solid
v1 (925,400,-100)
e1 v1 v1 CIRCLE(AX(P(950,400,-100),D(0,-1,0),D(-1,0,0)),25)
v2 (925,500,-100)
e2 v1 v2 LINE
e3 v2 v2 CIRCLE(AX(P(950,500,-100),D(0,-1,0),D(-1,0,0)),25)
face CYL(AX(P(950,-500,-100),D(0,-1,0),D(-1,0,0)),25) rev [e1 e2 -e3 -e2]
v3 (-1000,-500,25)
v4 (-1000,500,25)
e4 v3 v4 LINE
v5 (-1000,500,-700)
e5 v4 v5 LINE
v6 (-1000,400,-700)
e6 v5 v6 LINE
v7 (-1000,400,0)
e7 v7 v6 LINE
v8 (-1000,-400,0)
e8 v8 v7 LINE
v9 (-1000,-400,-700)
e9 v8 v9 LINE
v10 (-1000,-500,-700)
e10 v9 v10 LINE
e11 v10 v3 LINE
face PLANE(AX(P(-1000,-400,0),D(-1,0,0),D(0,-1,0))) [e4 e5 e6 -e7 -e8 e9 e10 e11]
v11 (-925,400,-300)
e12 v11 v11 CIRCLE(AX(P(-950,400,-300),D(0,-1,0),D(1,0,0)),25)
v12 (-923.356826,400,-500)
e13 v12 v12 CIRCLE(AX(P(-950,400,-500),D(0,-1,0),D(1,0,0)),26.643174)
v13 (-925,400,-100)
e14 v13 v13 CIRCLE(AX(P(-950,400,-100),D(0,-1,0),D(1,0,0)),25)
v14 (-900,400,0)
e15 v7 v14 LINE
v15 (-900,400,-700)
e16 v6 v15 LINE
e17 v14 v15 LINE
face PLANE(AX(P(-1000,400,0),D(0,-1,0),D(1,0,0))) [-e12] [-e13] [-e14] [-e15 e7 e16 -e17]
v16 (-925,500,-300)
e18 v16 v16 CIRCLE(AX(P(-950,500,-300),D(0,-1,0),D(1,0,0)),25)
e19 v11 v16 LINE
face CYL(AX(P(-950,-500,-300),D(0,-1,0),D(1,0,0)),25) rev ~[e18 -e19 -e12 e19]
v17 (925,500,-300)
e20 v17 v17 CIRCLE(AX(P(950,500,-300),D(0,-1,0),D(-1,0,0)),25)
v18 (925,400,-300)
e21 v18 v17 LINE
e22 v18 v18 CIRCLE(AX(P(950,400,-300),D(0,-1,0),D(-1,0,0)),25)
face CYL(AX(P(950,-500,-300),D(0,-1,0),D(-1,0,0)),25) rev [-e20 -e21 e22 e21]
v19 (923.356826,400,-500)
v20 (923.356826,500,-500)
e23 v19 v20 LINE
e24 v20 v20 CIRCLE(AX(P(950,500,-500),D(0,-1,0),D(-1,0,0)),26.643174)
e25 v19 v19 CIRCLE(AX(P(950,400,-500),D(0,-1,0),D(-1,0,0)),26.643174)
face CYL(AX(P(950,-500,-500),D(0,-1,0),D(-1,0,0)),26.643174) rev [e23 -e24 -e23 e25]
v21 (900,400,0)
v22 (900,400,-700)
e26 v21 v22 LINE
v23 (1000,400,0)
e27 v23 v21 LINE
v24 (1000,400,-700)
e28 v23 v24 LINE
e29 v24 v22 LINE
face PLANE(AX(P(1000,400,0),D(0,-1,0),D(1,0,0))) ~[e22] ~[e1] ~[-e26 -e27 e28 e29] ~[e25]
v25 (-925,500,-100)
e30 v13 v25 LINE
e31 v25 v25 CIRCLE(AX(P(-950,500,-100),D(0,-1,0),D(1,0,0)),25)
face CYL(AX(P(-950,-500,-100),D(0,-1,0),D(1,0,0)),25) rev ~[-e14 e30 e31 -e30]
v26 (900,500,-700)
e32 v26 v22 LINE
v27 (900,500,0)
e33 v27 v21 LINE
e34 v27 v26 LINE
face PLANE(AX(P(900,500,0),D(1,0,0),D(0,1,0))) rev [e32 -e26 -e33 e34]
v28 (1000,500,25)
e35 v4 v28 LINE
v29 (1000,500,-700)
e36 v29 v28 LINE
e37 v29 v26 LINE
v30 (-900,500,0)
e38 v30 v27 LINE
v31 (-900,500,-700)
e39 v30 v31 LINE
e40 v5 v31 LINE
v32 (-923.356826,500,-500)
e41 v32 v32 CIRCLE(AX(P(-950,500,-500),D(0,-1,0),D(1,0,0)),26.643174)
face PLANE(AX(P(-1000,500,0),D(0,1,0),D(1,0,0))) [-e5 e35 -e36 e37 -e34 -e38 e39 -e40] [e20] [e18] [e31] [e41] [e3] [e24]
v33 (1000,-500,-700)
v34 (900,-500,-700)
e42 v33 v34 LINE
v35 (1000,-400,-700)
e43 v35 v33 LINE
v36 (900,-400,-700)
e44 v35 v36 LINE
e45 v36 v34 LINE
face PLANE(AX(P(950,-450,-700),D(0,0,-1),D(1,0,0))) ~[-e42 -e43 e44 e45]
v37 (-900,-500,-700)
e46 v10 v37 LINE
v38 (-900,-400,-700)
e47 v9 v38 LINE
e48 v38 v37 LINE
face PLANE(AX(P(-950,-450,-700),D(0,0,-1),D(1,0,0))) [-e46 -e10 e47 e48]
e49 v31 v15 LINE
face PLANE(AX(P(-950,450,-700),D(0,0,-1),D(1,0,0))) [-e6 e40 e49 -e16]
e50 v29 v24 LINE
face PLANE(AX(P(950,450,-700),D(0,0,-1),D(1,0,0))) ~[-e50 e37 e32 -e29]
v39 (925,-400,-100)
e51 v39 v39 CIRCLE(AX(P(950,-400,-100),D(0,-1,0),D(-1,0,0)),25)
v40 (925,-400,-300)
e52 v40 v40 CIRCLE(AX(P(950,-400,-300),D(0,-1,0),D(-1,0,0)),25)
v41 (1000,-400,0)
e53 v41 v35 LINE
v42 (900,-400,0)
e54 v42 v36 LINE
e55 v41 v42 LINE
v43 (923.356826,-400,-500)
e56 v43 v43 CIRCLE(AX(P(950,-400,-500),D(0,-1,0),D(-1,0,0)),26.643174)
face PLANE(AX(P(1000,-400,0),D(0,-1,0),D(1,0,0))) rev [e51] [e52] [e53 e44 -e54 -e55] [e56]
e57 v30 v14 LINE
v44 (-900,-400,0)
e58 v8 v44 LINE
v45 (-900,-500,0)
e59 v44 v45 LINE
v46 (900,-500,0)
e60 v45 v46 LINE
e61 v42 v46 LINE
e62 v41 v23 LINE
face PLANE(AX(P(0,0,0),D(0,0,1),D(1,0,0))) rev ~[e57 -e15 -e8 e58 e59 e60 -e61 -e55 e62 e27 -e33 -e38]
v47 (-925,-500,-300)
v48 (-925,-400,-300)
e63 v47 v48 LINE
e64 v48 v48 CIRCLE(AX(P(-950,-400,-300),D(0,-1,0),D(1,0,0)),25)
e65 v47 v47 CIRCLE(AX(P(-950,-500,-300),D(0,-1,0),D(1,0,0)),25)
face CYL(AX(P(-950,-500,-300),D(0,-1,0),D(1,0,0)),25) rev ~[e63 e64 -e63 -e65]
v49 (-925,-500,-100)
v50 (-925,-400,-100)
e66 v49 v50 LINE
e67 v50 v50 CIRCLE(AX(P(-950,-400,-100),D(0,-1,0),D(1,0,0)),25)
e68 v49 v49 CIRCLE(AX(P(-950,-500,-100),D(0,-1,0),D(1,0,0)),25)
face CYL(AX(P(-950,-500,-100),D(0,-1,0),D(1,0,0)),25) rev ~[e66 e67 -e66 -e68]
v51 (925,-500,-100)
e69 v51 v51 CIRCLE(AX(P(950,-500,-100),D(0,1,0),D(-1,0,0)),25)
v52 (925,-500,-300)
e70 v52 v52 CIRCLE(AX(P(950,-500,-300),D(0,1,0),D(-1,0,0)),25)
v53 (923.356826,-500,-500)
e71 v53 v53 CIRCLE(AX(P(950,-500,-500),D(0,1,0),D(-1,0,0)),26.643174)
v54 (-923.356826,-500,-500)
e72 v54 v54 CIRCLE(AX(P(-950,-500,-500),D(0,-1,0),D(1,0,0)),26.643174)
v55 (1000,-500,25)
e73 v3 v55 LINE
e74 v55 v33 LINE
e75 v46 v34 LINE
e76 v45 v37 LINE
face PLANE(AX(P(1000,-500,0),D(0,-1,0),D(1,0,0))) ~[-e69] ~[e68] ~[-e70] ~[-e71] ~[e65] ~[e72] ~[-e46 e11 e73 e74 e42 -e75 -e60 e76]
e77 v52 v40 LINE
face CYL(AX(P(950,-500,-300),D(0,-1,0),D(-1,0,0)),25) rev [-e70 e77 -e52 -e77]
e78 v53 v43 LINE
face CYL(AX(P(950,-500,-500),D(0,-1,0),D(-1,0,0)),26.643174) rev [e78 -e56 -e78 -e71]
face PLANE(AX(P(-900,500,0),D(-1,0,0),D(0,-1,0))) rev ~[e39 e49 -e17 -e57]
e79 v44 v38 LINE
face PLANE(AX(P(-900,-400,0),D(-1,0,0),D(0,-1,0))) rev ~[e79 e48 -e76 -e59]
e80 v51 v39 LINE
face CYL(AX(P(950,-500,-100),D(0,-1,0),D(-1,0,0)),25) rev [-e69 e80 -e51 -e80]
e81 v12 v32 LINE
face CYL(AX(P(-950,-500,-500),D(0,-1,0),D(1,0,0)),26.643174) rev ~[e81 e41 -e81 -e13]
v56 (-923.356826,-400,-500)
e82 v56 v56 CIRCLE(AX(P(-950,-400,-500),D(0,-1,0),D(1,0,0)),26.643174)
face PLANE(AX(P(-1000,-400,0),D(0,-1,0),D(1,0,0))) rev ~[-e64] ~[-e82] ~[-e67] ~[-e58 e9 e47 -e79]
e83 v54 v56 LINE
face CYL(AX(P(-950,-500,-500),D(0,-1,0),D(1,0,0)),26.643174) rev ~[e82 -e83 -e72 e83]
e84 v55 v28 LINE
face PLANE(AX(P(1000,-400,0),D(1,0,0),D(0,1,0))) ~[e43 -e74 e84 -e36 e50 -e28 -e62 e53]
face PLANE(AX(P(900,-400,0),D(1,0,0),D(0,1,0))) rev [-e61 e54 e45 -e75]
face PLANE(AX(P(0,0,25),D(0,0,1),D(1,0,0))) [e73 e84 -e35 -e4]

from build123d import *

# Parameters (mm, degrees)
F0_W     = 2000
F0_H     = 1000
F1_DEPTH = 25
F2_W     = 100
F2_H     = 100
F4_DEPTH = 700
F3_R     = 25
F3_R_2   = 26.6431742527
F5_DEPTH = 1000.001
F6_R     = 138.4561690077
F7_W     = 118.5409426689
F7_H     = 157.5430333614
F9_T     = 2.5


# Not quite as in the source:
# - a pattern or mirror of a feature is missing from the dataset's text; its kind, count and spacing are read off the source's solid
# - a shell that OpenCascade refuses in one call is made with other operations: the cavity is built on its own and cut out


with BuildPart() as f1:
    # F0 (on Top) → F1 (new body)
    with BuildSketch(Plane.XY):
        Rectangle(F0_W, F0_H)
    extrude(amount=F1_DEPTH)

    # F2 (on face) → F4 (join)
    with BuildSketch(Plane(origin=(0, 0, 0), x_dir=(1, 0, 0), z_dir=(0, 0, -1))):
        with Locations((-950, 450)):
            Rectangle(F2_W, F2_H)
        with Locations((-950, -450)):
            Rectangle(F2_W, F2_H)
    f4 = extrude(amount=F4_DEPTH)

    # F4_copies: F4 across plane
    add(f4.mirror(Plane(origin=(0, 0, 0), x_dir=(0, 0, 1), z_dir=(1, 0, 0))))

    # F3 (on face) → F5 (cut, through all)
    with BuildSketch(Plane.XZ.offset(500)):
        with Locations((-950, -100)):
            Circle(F3_R)
        with Locations((-950, -300)):
            Circle(F3_R)
        with Locations((-950, -500)):
            Circle(F3_R_2)
    f5 = extrude(amount=-F5_DEPTH, mode=Mode.SUBTRACT)

    # F5_copies: F5 across plane
    add(f5.mirror(Plane(origin=(0, 0, 0), x_dir=(0, 0, 1), z_dir=(1, 0, 0))), mode=Mode.SUBTRACT)


with BuildPart() as f8:
    # F6 (on face) → F8 section 0
    with BuildSketch(Plane.XZ.offset(500)):
        with Locations((508.7250471115, -680.1778674126)):
            Circle(F6_R)
    # F7 (on face) → F8 section 1
    with BuildSketch(Plane.YZ.offset(-900)):
        with Locations((720.3351557255, -315.4024332762)):
            Rectangle(F7_W, F7_H)
    loft()

    # F9: shell of thickness 2.5, made by hand


with BuildPart() as f9_core1:
    # F9_t2: copy of F8
    add(f8.part)

    # the walls: a layer under each face that stays
    f9_faces = [f9_core1.faces().sort_by_distance(p)[0] for p in [
        (508.7250471115, -500, -680.1778674126),
        (-900, 720.3351557255, -315.4024332762),
    ]]
    thicken(f9_faces, amount=-F9_T, mode=Mode.SUBTRACT)


with BuildPart() as f8_1:
    add(f8.part)

    # what is left inside the walls is the cavity
    f9_cavity = [f9_core1.part.solids().sort_by_distance(p)[0] for p in [
        (-53.137215, -112.959985, -558.586056),
    ]]
    add(f9_cavity, mode=Mode.SUBTRACT)


solid = f1.part
